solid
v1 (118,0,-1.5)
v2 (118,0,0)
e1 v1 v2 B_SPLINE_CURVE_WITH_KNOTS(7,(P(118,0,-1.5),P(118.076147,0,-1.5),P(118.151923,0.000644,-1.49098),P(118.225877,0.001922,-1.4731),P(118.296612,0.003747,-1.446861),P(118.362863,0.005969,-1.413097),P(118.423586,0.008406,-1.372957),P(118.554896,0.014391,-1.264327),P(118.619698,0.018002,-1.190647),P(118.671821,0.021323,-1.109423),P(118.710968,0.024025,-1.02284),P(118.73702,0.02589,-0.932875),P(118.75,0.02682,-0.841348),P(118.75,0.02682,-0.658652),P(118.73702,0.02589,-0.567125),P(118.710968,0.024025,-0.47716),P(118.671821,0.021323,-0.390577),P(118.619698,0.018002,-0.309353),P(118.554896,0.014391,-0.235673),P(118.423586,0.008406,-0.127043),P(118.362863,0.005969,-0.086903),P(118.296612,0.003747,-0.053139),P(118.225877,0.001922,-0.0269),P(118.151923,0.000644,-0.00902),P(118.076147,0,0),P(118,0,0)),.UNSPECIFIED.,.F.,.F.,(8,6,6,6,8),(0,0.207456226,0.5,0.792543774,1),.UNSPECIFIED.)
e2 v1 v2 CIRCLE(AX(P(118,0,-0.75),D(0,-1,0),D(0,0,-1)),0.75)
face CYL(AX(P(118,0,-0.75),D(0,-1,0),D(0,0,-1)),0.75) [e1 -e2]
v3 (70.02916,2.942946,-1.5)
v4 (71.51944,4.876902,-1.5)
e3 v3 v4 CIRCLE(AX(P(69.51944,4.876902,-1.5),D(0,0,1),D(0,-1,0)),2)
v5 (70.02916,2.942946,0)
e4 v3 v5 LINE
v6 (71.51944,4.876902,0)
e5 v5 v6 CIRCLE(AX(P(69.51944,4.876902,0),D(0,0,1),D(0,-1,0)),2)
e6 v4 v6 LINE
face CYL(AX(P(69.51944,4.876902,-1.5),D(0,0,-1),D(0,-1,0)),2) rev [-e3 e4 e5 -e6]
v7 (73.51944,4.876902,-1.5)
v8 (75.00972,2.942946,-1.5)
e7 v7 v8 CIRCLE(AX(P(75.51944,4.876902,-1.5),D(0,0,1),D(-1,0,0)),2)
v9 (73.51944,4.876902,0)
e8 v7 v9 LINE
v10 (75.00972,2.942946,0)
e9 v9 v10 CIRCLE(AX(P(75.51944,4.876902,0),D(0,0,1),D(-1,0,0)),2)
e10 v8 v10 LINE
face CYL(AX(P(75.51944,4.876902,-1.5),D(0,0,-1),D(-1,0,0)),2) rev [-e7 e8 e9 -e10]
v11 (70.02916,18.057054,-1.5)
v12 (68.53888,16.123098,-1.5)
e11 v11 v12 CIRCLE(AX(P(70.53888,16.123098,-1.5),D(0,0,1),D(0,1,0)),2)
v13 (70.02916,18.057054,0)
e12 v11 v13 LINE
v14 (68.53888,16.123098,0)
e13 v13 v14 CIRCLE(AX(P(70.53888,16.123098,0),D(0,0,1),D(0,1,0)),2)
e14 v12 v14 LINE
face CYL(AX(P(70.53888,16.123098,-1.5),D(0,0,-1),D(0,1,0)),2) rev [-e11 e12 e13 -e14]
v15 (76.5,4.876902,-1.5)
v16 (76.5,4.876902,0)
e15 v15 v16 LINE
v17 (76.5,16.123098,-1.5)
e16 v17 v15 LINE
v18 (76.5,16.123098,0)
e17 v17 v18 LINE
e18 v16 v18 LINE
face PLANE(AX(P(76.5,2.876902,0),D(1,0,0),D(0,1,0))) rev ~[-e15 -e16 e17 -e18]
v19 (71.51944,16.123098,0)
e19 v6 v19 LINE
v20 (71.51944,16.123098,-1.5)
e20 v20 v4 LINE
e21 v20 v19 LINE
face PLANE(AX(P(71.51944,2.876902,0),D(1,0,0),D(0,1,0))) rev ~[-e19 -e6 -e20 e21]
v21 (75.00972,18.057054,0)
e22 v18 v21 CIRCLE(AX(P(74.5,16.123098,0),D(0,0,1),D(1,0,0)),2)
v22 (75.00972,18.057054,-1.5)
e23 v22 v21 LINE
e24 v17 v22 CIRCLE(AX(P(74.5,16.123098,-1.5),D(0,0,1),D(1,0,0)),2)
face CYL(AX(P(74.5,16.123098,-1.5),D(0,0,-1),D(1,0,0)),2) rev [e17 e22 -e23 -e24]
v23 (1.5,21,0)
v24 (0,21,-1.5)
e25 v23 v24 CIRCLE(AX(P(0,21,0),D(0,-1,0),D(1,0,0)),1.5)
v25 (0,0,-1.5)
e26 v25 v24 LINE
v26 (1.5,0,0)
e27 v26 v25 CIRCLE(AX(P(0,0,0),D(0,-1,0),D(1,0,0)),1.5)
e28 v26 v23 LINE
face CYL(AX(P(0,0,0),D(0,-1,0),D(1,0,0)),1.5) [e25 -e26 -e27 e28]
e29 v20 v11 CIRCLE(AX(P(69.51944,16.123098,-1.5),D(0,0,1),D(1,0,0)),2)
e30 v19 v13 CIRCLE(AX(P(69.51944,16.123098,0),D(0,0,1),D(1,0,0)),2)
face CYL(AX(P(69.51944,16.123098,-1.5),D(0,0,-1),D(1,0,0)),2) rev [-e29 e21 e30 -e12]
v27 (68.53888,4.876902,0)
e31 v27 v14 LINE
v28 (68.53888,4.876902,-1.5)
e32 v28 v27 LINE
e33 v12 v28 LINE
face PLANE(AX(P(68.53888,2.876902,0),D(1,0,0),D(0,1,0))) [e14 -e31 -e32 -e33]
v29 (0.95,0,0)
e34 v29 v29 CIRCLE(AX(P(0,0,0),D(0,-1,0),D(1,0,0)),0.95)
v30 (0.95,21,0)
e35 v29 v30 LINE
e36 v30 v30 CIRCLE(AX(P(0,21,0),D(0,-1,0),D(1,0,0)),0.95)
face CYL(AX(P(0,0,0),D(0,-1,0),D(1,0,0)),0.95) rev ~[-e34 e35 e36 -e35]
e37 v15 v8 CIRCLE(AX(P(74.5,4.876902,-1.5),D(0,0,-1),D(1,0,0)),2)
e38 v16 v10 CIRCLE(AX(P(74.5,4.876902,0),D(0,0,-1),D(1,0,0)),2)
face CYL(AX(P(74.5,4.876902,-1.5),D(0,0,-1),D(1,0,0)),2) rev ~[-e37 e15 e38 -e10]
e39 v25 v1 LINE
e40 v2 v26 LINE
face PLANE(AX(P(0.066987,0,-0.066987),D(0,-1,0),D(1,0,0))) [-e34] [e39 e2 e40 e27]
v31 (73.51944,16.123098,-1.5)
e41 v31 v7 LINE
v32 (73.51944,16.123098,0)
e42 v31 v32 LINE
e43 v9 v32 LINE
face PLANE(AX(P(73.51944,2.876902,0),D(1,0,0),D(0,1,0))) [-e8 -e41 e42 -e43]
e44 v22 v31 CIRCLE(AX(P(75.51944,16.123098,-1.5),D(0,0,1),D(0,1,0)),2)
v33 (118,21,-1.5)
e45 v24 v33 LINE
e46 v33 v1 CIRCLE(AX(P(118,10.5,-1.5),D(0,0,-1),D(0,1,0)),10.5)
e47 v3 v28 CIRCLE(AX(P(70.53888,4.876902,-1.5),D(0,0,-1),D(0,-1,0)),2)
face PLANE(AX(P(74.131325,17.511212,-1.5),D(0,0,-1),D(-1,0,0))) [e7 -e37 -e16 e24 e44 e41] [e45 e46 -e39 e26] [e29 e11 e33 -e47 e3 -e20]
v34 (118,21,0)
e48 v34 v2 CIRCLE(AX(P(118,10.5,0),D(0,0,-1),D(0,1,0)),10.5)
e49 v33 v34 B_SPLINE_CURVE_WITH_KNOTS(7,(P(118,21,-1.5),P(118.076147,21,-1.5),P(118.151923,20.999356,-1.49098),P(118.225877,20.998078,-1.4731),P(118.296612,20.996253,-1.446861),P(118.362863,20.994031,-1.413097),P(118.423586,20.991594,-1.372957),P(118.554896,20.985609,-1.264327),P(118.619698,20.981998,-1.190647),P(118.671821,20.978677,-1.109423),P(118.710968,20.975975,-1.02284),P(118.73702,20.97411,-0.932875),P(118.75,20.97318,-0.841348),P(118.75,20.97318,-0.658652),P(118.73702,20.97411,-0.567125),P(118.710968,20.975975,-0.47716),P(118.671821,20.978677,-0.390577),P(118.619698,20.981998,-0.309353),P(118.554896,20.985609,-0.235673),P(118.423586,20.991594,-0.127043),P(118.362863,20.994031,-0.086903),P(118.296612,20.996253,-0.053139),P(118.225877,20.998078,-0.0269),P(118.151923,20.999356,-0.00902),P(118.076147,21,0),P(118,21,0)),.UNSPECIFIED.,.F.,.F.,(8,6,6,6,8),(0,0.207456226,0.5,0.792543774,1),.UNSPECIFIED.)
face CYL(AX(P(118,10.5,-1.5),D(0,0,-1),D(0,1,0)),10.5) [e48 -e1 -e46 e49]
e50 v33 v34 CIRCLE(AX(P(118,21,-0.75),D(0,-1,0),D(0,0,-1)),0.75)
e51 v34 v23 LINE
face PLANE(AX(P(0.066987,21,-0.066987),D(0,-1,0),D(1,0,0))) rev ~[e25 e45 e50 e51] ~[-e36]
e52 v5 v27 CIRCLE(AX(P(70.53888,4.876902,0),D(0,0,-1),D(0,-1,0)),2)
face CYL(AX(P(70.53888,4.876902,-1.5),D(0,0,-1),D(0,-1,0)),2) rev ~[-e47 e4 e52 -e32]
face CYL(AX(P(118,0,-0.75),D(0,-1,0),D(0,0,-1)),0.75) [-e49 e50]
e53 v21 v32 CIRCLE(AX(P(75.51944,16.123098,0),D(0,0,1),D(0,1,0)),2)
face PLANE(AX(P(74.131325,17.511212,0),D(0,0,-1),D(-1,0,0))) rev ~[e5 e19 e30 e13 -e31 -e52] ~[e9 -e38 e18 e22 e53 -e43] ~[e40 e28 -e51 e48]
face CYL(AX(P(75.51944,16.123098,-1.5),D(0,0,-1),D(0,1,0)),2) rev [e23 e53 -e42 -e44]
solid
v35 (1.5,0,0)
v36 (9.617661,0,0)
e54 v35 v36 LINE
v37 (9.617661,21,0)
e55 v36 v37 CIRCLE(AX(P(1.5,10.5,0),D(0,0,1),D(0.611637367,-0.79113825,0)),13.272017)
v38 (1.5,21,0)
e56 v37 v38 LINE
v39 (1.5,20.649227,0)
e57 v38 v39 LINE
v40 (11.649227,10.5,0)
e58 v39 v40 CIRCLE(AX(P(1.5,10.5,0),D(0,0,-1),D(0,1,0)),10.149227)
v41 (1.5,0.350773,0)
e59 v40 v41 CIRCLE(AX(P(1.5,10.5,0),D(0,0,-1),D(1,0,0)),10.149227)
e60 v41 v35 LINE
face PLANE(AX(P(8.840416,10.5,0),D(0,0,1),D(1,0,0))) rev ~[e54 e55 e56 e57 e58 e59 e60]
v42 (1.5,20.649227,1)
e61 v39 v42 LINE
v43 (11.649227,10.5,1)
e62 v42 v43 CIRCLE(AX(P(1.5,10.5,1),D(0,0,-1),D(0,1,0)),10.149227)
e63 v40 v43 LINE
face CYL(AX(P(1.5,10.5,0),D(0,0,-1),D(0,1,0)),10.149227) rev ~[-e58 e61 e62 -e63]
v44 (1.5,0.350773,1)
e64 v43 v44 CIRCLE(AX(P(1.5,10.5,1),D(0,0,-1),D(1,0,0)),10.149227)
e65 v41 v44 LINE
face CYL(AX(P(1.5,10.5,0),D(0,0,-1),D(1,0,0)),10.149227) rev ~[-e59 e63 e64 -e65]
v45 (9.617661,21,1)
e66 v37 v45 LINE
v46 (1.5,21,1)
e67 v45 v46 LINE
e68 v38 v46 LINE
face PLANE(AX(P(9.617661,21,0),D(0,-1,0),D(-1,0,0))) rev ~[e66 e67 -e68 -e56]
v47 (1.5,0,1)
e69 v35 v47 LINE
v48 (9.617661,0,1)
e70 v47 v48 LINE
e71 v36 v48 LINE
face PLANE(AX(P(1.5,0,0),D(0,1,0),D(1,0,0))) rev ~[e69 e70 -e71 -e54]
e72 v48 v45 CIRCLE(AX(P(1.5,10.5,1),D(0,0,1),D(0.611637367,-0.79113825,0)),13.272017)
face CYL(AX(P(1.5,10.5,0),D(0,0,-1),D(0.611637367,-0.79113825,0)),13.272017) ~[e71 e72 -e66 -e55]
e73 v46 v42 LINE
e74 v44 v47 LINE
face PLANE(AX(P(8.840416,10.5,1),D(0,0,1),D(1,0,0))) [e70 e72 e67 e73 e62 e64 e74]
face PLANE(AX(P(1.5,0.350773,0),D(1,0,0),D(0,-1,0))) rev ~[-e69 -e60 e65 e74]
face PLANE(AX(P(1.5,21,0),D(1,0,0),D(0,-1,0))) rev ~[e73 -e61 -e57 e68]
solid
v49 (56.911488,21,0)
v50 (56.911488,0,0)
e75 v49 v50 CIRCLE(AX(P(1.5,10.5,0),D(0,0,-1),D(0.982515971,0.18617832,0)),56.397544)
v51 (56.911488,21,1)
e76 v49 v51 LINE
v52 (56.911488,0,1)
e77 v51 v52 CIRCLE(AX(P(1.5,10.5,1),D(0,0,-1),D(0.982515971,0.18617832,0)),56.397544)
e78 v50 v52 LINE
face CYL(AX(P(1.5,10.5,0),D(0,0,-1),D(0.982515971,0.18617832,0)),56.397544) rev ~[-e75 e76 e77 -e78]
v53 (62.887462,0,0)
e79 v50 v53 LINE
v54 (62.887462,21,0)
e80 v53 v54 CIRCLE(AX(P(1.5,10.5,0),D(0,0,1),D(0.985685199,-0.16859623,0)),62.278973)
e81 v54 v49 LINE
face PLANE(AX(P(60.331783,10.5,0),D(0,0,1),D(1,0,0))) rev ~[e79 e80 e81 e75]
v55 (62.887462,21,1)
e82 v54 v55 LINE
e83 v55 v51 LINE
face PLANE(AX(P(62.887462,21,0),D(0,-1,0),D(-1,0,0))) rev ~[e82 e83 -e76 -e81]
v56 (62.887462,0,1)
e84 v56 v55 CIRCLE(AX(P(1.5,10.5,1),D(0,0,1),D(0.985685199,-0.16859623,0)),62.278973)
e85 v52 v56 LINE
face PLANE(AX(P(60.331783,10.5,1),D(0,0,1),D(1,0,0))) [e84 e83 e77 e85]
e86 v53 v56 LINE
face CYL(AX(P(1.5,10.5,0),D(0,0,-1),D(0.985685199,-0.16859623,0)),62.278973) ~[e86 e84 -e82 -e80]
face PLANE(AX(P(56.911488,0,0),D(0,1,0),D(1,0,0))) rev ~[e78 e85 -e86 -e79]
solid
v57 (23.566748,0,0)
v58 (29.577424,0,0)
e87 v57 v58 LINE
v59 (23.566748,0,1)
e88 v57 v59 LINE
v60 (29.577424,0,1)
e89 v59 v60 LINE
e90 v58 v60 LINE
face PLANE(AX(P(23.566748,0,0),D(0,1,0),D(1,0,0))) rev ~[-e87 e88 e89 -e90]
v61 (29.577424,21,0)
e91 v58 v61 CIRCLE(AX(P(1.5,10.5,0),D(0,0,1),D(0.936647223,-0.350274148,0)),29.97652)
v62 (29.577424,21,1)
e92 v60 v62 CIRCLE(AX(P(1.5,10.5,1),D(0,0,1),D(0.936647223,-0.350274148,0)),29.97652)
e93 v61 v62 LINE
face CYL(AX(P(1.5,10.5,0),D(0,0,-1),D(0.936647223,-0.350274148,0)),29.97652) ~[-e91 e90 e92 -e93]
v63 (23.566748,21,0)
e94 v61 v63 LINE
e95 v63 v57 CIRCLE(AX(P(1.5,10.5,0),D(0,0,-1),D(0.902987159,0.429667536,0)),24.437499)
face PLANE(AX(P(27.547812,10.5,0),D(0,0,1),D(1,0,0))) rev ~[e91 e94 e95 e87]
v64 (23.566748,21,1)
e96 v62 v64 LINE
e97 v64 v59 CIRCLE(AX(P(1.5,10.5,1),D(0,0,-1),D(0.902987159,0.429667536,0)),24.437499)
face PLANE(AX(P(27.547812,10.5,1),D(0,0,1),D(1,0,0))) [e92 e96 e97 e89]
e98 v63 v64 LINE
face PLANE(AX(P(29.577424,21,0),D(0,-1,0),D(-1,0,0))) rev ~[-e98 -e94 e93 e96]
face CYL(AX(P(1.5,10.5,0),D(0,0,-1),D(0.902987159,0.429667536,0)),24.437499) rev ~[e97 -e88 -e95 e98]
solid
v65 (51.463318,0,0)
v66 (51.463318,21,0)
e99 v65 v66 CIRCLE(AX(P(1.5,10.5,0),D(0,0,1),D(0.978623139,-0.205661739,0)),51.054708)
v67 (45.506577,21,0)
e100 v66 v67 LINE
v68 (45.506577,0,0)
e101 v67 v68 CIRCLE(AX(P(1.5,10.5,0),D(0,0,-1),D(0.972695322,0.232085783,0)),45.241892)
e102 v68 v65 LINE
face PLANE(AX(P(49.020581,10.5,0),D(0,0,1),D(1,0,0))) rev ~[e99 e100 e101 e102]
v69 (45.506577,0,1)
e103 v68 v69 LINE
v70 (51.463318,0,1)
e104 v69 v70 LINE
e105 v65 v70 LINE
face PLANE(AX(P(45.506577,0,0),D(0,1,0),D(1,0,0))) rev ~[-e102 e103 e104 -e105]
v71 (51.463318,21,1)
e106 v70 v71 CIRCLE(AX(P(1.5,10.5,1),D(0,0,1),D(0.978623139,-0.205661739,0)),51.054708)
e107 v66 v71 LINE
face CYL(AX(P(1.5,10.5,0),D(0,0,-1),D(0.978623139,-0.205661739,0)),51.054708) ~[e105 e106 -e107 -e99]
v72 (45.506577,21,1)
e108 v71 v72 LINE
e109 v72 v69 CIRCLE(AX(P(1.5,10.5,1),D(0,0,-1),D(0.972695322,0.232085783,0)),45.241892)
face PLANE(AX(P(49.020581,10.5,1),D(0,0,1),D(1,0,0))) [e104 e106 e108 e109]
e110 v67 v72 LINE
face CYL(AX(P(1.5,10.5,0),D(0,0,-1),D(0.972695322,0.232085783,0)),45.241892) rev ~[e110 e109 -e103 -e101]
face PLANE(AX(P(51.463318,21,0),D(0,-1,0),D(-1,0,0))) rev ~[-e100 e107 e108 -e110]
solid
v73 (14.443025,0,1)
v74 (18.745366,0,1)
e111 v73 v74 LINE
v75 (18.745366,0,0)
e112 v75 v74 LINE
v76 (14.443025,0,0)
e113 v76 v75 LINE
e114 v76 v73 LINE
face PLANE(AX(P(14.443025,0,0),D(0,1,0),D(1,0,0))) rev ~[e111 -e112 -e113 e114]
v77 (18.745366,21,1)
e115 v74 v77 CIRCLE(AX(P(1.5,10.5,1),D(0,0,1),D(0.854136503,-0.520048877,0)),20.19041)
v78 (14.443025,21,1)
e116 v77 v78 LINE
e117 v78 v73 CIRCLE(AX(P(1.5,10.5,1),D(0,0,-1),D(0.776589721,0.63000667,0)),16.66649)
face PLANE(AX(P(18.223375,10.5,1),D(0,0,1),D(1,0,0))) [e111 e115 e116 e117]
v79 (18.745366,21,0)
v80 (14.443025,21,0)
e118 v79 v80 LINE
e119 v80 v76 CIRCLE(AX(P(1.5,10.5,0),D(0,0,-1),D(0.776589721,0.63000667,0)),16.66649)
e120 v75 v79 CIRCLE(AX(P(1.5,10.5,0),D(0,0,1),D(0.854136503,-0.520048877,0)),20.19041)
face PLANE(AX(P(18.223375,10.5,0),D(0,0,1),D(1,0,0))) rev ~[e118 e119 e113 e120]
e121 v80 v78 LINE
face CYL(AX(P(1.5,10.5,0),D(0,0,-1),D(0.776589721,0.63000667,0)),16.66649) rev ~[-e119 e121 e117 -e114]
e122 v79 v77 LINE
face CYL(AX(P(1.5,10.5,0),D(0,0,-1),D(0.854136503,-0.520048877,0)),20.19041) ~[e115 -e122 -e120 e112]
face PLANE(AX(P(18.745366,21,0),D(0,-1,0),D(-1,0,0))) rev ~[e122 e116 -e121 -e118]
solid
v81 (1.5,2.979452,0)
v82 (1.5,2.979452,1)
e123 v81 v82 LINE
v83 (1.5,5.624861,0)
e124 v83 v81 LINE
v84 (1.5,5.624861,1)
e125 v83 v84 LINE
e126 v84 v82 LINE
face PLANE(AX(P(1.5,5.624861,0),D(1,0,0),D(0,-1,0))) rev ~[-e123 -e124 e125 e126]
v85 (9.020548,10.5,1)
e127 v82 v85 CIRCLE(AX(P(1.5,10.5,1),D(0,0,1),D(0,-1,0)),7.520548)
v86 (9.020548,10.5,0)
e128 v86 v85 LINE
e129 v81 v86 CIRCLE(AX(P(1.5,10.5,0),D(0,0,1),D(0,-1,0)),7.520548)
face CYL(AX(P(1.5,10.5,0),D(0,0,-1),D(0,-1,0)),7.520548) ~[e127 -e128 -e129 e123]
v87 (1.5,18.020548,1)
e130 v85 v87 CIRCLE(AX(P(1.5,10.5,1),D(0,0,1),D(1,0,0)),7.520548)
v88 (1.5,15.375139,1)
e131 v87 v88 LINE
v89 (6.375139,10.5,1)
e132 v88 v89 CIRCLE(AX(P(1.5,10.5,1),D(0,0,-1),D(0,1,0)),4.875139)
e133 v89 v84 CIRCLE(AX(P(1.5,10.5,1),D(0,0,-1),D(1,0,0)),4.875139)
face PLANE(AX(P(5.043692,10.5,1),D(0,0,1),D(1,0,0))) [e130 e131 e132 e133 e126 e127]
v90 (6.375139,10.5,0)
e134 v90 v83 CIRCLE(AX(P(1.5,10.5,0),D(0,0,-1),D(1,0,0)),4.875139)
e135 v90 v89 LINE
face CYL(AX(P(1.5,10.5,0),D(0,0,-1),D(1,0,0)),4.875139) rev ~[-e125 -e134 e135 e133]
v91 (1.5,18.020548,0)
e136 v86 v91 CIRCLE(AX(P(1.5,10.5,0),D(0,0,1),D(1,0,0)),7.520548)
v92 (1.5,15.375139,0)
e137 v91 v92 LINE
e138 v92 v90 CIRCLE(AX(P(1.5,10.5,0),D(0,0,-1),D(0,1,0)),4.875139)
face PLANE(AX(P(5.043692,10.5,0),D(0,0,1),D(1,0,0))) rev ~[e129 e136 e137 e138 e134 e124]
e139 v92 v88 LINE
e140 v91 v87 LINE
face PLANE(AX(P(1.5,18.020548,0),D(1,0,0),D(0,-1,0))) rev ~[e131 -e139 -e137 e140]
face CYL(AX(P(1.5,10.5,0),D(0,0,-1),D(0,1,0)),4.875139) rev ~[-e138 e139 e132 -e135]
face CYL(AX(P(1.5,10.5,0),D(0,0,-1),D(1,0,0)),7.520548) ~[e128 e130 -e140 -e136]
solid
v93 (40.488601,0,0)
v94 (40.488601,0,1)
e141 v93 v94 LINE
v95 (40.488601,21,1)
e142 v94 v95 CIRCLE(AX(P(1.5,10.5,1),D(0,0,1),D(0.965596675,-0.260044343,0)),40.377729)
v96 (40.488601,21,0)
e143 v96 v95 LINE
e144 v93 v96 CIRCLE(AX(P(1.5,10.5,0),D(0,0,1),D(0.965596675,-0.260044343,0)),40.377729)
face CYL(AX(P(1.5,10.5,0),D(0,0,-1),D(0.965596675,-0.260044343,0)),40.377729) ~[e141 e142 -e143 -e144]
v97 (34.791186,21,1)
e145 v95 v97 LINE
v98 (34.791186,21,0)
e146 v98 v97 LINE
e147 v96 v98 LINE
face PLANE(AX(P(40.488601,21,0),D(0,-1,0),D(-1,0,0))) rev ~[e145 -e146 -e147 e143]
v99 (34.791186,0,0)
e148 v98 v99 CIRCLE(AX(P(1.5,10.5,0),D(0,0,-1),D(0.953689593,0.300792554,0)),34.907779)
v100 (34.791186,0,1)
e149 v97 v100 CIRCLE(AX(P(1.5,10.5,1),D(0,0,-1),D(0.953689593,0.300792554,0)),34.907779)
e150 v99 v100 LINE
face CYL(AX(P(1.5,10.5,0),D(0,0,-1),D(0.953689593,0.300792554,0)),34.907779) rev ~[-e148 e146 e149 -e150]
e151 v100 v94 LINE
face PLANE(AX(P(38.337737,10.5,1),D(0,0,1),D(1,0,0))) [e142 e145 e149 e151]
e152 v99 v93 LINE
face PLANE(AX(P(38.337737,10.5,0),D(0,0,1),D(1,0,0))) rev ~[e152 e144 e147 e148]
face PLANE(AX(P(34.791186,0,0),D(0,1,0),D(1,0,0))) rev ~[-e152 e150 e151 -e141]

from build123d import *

# Parameters (mm, degrees)
F1_DEPTH    = 21
F3_DEPTH    = 1.5
F4_R        = 0.95
F5_DEPTH    = 25.4
F6_W        = 2.9805600643
F6_H        = 15.2461954355
F7_DEPTH    = 25.4
F8_T1_DEPTH = 1.5
F9_T1_DEPTH = 1.5
F11_DEPTH   = 1


# Not quite as in the source:
# - a fillet or chamfer that OpenCascade refuses, or shapes differently, is made with other operations: its cross-section is extruded or revolved along the edge and cut away or added


with BuildPart() as f1:
    # F0 (on Front) → F1 (new body)
    with BuildSketch(Plane.XZ):
        with BuildLine():
            ThreePointArc((0, -1.5), (1.0606601718, -1.0606601718), (1.5, 0))
            ThreePointArc((1.5, 0), (-1.0606601718, 1.0606601718), (0, -1.5))
        make_face()
        with BuildLine():
            Line((118, 0), (1.5, 0))
            ThreePointArc((1.5, 0), (1.0606601718, -1.0606601718), (0, -1.5))
            Line((0, -1.5), (118, -1.5))
            ThreePointArc((118, -1.5), (118.75, -0.75), (118, 0))
        make_face()
    extrude(amount=-F1_DEPTH)

    # F2 (on face) → F3 (join)
    with BuildSketch(Plane(origin=(0, 0, -1.5), x_dir=(1, 0, 0), z_dir=(0, 0, -1))):
        with BuildLine():
            Line((118, 0), (118, -21))
            ThreePointArc((118, -21), (128.5, -10.5), (118, 0))
        make_face()
    extrude(amount=-F3_DEPTH)

    # F4 (on face) → F5 (cut)
    with BuildSketch(Plane.XZ):
        Circle(F4_R)
    extrude(amount=-F5_DEPTH, mode=Mode.SUBTRACT)

    # F6 (on face) → F7 (cut)
    with BuildSketch(Plane.XY):
        with Locations((70.0291599035, 10.4999999497)):
            Rectangle(F6_W, F6_H)
        with Locations((75.0097199678, 10.5)):
            Rectangle(F6_W, F6_H)
    extrude(amount=-F7_DEPTH, mode=Mode.SUBTRACT)

    # F8: fillet of radius 2 on 4 edges, made by hand

    # F8_s2 → F8_t1 (join)
    with BuildSketch(Plane.XY.offset(-1.5)):
        with BuildLine():
            ThreePointArc((70.5388798714, 2.8769022319), (69.124666309, 3.4626886696), (68.5388798714, 4.8769022319))
            Line((68.5388798714, 4.8769022319), (68.5388798714, 2.8769022319))
            Line((68.5388798714, 2.8769022319), (70.5388798714, 2.8769022319))
        make_face()
        with BuildLine():
            ThreePointArc((70.5388798714, 18.1230976675), (69.124666309, 17.5373112298), (68.5388798714, 16.1230976675))
            Line((68.5388798714, 16.1230976675), (68.5388798714, 18.1230976675))
            Line((68.5388798714, 18.1230976675), (70.5388798714, 18.1230976675))
        make_face()
        with BuildLine():
            ThreePointArc((71.5194399357, 16.1230976675), (70.9336534981, 17.5373112298), (69.5194399357, 18.1230976675))
            Line((69.5194399357, 18.1230976675), (71.5194399357, 18.1230976675))
            Line((71.5194399357, 18.1230976675), (71.5194399357, 16.1230976675))
        make_face()
        with BuildLine():
            ThreePointArc((69.5194399357, 2.8769022319), (70.9336534981, 3.4626886696), (71.5194399357, 4.8769022319))
            Line((71.5194399357, 4.8769022319), (71.5194399357, 2.8769022319))
            Line((71.5194399357, 2.8769022319), (69.5194399357, 2.8769022319))
        make_face()
    extrude(amount=F8_T1_DEPTH)

    # F9: fillet of radius 2 on 4 edges, made by hand

    # F9_s2 → F9_t1 (join)
    with BuildSketch(Plane.XY.offset(-1.5)):
        with BuildLine():
            ThreePointArc((75.5194399357, 18.1230977178), (74.1052263733, 17.5373112801), (73.5194399357, 16.1230977178))
            Line((73.5194399357, 16.1230977178), (73.5194399357, 18.1230977178))
            Line((73.5194399357, 18.1230977178), (75.5194399357, 18.1230977178))
        make_face()
        with BuildLine():
            ThreePointArc((73.5194399357, 4.8769022822), (74.1052263733, 3.4626887199), (75.5194399357, 2.8769022822))
            Line((75.5194399357, 2.8769022822), (73.5194399357, 2.8769022822))
            Line((73.5194399357, 2.8769022822), (73.5194399357, 4.8769022822))
        make_face()
        with BuildLine():
            ThreePointArc((76.5, 4.8769022822), (75.9142135624, 3.4626887199), (74.5, 2.8769022822))
            Line((74.5, 2.8769022822), (76.5, 2.8769022822))
            Line((76.5, 2.8769022822), (76.5, 4.8769022822))
        make_face()
        with BuildLine():
            ThreePointArc((76.5, 16.1230977178), (75.9142135624, 17.5373112801), (74.5, 18.1230977178))
            Line((74.5, 18.1230977178), (76.5, 18.1230977178))
            Line((76.5, 18.1230977178), (76.5, 16.1230977178))
        make_face()
    extrude(amount=F9_T1_DEPTH)


with BuildPart() as f11:
    # F10 (on face) → F11 (new body)
    with BuildSketch(Plane.XY):
        with BuildLine():
            Line((1.5, 18.0205481217), (1.5, 15.3751391684))
            ThreePointArc((1.5, 15.3751391684), (4.9472439652, 13.9472439652), (6.3751391684, 10.5))
            ThreePointArc((6.3751391684, 10.5), (4.9472439652, 7.0527560348), (1.5, 5.6248608316))
            Line((1.5, 5.6248608316), (1.5, 2.9794518783))
            ThreePointArc((1.5, 2.9794518783), (6.8178305751, 5.1821694249), (9.0205481217, 10.5))
            ThreePointArc((9.0205481217, 10.5), (6.8178305751, 15.8178305751), (1.5, 18.0205481217))
        make_face()
    extrude(amount=F11_DEPTH)


with BuildPart() as f11b:
    # F10 (on face) → F11, piece 2 (new body)
    with BuildSketch(Plane.XY):
        with BuildLine():
            Line((1.5, 21), (1.5, 20.6492265591))
            ThreePointArc((1.5, 20.6492265591), (8.6765869237, 17.6765869237), (11.6492265591, 10.5))
            ThreePointArc((11.6492265591, 10.5), (8.6765869237, 3.3234130763), (1.5, 0.3507734409))
            Line((1.5, 0.3507734409), (1.5, 0))
            Line((1.5, 0), (9.6176613001, 0))
            ThreePointArc((9.6176613001, 0), (14.7720166133, 10.5), (9.6176613001, 21))
            Line((9.6176613001, 21), (1.5, 21))
        make_face()
    extrude(amount=F11_DEPTH)


with BuildPart() as f11c:
    # F10 (on face) → F11, piece 3 (new body)
    with BuildSketch(Plane.XY):
        with BuildLine():
            Line((18.7453661335, 21), (14.4430249836, 21))
            ThreePointArc((14.4430249836, 21), (18.1664902042, 10.5), (14.4430249836, 0))
            Line((14.4430249836, 0), (18.7453661335, 0))
            ThreePointArc((18.7453661335, 0), (21.6904099284, 10.5), (18.7453661335, 21))
        make_face()
    extrude(amount=F11_DEPTH)


with BuildPart() as f11d:
    # F10 (on face) → F11, piece 4 (new body)
    with BuildSketch(Plane.XY):
        with BuildLine():
            Line((29.5774242132, 21), (23.5667478281, 21))
            ThreePointArc((23.5667478281, 21), (25.9374990477, 10.5), (23.5667478281, 0))
            Line((23.5667478281, 0), (29.5774242132, 0))
            ThreePointArc((29.5774242132, 0), (31.4765199856, 10.5), (29.5774242132, 21))
        make_face()
    extrude(amount=F11_DEPTH)


with BuildPart() as f11e:
    # F10 (on face) → F11, piece 5 (new body)
    with BuildSketch(Plane.XY):
        with BuildLine():
            Line((40.4886008324, 21), (34.7911855171, 21))
            ThreePointArc((34.7911855171, 21), (36.4077789774, 10.5), (34.7911855171, 0))
            Line((34.7911855171, 0), (40.4886008324, 0))
            ThreePointArc((40.4886008324, 0), (41.8777289464, 10.5), (40.4886008324, 21))
        make_face()
    extrude(amount=F11_DEPTH)


with BuildPart() as f11f:
    # F10 (on face) → F11, piece 6 (new body)
    with BuildSketch(Plane.XY):
        with BuildLine():
            Line((51.4633184784, 21), (45.5065769526, 21))
            ThreePointArc((45.5065769526, 21), (46.741892258, 10.5), (45.5065769526, 0))
            Line((45.5065769526, 0), (51.4633184784, 0))
            ThreePointArc((51.4633184784, 0), (52.5547078473, 10.5), (51.4633184784, 21))
        make_face()
    extrude(amount=F11_DEPTH)


with BuildPart() as f11g:
    # F10 (on face) → F11, piece 7 (new body)
    with BuildSketch(Plane.XY):
        with BuildLine():
            Line((62.8874615739, 21), (56.9114878139, 21))
            ThreePointArc((56.9114878139, 21), (57.897544111, 10.5), (56.9114878139, 0))
            Line((56.9114878139, 0), (62.8874615739, 0))
            ThreePointArc((62.8874615739, 0), (63.7789726833, 10.5), (62.8874615739, 21))
        make_face()
    extrude(amount=F11_DEPTH)


solid = Compound([f1.part, f11.part, f11b.part, f11c.part, f11d.part, f11e.part, f11f.part, f11g.part])
